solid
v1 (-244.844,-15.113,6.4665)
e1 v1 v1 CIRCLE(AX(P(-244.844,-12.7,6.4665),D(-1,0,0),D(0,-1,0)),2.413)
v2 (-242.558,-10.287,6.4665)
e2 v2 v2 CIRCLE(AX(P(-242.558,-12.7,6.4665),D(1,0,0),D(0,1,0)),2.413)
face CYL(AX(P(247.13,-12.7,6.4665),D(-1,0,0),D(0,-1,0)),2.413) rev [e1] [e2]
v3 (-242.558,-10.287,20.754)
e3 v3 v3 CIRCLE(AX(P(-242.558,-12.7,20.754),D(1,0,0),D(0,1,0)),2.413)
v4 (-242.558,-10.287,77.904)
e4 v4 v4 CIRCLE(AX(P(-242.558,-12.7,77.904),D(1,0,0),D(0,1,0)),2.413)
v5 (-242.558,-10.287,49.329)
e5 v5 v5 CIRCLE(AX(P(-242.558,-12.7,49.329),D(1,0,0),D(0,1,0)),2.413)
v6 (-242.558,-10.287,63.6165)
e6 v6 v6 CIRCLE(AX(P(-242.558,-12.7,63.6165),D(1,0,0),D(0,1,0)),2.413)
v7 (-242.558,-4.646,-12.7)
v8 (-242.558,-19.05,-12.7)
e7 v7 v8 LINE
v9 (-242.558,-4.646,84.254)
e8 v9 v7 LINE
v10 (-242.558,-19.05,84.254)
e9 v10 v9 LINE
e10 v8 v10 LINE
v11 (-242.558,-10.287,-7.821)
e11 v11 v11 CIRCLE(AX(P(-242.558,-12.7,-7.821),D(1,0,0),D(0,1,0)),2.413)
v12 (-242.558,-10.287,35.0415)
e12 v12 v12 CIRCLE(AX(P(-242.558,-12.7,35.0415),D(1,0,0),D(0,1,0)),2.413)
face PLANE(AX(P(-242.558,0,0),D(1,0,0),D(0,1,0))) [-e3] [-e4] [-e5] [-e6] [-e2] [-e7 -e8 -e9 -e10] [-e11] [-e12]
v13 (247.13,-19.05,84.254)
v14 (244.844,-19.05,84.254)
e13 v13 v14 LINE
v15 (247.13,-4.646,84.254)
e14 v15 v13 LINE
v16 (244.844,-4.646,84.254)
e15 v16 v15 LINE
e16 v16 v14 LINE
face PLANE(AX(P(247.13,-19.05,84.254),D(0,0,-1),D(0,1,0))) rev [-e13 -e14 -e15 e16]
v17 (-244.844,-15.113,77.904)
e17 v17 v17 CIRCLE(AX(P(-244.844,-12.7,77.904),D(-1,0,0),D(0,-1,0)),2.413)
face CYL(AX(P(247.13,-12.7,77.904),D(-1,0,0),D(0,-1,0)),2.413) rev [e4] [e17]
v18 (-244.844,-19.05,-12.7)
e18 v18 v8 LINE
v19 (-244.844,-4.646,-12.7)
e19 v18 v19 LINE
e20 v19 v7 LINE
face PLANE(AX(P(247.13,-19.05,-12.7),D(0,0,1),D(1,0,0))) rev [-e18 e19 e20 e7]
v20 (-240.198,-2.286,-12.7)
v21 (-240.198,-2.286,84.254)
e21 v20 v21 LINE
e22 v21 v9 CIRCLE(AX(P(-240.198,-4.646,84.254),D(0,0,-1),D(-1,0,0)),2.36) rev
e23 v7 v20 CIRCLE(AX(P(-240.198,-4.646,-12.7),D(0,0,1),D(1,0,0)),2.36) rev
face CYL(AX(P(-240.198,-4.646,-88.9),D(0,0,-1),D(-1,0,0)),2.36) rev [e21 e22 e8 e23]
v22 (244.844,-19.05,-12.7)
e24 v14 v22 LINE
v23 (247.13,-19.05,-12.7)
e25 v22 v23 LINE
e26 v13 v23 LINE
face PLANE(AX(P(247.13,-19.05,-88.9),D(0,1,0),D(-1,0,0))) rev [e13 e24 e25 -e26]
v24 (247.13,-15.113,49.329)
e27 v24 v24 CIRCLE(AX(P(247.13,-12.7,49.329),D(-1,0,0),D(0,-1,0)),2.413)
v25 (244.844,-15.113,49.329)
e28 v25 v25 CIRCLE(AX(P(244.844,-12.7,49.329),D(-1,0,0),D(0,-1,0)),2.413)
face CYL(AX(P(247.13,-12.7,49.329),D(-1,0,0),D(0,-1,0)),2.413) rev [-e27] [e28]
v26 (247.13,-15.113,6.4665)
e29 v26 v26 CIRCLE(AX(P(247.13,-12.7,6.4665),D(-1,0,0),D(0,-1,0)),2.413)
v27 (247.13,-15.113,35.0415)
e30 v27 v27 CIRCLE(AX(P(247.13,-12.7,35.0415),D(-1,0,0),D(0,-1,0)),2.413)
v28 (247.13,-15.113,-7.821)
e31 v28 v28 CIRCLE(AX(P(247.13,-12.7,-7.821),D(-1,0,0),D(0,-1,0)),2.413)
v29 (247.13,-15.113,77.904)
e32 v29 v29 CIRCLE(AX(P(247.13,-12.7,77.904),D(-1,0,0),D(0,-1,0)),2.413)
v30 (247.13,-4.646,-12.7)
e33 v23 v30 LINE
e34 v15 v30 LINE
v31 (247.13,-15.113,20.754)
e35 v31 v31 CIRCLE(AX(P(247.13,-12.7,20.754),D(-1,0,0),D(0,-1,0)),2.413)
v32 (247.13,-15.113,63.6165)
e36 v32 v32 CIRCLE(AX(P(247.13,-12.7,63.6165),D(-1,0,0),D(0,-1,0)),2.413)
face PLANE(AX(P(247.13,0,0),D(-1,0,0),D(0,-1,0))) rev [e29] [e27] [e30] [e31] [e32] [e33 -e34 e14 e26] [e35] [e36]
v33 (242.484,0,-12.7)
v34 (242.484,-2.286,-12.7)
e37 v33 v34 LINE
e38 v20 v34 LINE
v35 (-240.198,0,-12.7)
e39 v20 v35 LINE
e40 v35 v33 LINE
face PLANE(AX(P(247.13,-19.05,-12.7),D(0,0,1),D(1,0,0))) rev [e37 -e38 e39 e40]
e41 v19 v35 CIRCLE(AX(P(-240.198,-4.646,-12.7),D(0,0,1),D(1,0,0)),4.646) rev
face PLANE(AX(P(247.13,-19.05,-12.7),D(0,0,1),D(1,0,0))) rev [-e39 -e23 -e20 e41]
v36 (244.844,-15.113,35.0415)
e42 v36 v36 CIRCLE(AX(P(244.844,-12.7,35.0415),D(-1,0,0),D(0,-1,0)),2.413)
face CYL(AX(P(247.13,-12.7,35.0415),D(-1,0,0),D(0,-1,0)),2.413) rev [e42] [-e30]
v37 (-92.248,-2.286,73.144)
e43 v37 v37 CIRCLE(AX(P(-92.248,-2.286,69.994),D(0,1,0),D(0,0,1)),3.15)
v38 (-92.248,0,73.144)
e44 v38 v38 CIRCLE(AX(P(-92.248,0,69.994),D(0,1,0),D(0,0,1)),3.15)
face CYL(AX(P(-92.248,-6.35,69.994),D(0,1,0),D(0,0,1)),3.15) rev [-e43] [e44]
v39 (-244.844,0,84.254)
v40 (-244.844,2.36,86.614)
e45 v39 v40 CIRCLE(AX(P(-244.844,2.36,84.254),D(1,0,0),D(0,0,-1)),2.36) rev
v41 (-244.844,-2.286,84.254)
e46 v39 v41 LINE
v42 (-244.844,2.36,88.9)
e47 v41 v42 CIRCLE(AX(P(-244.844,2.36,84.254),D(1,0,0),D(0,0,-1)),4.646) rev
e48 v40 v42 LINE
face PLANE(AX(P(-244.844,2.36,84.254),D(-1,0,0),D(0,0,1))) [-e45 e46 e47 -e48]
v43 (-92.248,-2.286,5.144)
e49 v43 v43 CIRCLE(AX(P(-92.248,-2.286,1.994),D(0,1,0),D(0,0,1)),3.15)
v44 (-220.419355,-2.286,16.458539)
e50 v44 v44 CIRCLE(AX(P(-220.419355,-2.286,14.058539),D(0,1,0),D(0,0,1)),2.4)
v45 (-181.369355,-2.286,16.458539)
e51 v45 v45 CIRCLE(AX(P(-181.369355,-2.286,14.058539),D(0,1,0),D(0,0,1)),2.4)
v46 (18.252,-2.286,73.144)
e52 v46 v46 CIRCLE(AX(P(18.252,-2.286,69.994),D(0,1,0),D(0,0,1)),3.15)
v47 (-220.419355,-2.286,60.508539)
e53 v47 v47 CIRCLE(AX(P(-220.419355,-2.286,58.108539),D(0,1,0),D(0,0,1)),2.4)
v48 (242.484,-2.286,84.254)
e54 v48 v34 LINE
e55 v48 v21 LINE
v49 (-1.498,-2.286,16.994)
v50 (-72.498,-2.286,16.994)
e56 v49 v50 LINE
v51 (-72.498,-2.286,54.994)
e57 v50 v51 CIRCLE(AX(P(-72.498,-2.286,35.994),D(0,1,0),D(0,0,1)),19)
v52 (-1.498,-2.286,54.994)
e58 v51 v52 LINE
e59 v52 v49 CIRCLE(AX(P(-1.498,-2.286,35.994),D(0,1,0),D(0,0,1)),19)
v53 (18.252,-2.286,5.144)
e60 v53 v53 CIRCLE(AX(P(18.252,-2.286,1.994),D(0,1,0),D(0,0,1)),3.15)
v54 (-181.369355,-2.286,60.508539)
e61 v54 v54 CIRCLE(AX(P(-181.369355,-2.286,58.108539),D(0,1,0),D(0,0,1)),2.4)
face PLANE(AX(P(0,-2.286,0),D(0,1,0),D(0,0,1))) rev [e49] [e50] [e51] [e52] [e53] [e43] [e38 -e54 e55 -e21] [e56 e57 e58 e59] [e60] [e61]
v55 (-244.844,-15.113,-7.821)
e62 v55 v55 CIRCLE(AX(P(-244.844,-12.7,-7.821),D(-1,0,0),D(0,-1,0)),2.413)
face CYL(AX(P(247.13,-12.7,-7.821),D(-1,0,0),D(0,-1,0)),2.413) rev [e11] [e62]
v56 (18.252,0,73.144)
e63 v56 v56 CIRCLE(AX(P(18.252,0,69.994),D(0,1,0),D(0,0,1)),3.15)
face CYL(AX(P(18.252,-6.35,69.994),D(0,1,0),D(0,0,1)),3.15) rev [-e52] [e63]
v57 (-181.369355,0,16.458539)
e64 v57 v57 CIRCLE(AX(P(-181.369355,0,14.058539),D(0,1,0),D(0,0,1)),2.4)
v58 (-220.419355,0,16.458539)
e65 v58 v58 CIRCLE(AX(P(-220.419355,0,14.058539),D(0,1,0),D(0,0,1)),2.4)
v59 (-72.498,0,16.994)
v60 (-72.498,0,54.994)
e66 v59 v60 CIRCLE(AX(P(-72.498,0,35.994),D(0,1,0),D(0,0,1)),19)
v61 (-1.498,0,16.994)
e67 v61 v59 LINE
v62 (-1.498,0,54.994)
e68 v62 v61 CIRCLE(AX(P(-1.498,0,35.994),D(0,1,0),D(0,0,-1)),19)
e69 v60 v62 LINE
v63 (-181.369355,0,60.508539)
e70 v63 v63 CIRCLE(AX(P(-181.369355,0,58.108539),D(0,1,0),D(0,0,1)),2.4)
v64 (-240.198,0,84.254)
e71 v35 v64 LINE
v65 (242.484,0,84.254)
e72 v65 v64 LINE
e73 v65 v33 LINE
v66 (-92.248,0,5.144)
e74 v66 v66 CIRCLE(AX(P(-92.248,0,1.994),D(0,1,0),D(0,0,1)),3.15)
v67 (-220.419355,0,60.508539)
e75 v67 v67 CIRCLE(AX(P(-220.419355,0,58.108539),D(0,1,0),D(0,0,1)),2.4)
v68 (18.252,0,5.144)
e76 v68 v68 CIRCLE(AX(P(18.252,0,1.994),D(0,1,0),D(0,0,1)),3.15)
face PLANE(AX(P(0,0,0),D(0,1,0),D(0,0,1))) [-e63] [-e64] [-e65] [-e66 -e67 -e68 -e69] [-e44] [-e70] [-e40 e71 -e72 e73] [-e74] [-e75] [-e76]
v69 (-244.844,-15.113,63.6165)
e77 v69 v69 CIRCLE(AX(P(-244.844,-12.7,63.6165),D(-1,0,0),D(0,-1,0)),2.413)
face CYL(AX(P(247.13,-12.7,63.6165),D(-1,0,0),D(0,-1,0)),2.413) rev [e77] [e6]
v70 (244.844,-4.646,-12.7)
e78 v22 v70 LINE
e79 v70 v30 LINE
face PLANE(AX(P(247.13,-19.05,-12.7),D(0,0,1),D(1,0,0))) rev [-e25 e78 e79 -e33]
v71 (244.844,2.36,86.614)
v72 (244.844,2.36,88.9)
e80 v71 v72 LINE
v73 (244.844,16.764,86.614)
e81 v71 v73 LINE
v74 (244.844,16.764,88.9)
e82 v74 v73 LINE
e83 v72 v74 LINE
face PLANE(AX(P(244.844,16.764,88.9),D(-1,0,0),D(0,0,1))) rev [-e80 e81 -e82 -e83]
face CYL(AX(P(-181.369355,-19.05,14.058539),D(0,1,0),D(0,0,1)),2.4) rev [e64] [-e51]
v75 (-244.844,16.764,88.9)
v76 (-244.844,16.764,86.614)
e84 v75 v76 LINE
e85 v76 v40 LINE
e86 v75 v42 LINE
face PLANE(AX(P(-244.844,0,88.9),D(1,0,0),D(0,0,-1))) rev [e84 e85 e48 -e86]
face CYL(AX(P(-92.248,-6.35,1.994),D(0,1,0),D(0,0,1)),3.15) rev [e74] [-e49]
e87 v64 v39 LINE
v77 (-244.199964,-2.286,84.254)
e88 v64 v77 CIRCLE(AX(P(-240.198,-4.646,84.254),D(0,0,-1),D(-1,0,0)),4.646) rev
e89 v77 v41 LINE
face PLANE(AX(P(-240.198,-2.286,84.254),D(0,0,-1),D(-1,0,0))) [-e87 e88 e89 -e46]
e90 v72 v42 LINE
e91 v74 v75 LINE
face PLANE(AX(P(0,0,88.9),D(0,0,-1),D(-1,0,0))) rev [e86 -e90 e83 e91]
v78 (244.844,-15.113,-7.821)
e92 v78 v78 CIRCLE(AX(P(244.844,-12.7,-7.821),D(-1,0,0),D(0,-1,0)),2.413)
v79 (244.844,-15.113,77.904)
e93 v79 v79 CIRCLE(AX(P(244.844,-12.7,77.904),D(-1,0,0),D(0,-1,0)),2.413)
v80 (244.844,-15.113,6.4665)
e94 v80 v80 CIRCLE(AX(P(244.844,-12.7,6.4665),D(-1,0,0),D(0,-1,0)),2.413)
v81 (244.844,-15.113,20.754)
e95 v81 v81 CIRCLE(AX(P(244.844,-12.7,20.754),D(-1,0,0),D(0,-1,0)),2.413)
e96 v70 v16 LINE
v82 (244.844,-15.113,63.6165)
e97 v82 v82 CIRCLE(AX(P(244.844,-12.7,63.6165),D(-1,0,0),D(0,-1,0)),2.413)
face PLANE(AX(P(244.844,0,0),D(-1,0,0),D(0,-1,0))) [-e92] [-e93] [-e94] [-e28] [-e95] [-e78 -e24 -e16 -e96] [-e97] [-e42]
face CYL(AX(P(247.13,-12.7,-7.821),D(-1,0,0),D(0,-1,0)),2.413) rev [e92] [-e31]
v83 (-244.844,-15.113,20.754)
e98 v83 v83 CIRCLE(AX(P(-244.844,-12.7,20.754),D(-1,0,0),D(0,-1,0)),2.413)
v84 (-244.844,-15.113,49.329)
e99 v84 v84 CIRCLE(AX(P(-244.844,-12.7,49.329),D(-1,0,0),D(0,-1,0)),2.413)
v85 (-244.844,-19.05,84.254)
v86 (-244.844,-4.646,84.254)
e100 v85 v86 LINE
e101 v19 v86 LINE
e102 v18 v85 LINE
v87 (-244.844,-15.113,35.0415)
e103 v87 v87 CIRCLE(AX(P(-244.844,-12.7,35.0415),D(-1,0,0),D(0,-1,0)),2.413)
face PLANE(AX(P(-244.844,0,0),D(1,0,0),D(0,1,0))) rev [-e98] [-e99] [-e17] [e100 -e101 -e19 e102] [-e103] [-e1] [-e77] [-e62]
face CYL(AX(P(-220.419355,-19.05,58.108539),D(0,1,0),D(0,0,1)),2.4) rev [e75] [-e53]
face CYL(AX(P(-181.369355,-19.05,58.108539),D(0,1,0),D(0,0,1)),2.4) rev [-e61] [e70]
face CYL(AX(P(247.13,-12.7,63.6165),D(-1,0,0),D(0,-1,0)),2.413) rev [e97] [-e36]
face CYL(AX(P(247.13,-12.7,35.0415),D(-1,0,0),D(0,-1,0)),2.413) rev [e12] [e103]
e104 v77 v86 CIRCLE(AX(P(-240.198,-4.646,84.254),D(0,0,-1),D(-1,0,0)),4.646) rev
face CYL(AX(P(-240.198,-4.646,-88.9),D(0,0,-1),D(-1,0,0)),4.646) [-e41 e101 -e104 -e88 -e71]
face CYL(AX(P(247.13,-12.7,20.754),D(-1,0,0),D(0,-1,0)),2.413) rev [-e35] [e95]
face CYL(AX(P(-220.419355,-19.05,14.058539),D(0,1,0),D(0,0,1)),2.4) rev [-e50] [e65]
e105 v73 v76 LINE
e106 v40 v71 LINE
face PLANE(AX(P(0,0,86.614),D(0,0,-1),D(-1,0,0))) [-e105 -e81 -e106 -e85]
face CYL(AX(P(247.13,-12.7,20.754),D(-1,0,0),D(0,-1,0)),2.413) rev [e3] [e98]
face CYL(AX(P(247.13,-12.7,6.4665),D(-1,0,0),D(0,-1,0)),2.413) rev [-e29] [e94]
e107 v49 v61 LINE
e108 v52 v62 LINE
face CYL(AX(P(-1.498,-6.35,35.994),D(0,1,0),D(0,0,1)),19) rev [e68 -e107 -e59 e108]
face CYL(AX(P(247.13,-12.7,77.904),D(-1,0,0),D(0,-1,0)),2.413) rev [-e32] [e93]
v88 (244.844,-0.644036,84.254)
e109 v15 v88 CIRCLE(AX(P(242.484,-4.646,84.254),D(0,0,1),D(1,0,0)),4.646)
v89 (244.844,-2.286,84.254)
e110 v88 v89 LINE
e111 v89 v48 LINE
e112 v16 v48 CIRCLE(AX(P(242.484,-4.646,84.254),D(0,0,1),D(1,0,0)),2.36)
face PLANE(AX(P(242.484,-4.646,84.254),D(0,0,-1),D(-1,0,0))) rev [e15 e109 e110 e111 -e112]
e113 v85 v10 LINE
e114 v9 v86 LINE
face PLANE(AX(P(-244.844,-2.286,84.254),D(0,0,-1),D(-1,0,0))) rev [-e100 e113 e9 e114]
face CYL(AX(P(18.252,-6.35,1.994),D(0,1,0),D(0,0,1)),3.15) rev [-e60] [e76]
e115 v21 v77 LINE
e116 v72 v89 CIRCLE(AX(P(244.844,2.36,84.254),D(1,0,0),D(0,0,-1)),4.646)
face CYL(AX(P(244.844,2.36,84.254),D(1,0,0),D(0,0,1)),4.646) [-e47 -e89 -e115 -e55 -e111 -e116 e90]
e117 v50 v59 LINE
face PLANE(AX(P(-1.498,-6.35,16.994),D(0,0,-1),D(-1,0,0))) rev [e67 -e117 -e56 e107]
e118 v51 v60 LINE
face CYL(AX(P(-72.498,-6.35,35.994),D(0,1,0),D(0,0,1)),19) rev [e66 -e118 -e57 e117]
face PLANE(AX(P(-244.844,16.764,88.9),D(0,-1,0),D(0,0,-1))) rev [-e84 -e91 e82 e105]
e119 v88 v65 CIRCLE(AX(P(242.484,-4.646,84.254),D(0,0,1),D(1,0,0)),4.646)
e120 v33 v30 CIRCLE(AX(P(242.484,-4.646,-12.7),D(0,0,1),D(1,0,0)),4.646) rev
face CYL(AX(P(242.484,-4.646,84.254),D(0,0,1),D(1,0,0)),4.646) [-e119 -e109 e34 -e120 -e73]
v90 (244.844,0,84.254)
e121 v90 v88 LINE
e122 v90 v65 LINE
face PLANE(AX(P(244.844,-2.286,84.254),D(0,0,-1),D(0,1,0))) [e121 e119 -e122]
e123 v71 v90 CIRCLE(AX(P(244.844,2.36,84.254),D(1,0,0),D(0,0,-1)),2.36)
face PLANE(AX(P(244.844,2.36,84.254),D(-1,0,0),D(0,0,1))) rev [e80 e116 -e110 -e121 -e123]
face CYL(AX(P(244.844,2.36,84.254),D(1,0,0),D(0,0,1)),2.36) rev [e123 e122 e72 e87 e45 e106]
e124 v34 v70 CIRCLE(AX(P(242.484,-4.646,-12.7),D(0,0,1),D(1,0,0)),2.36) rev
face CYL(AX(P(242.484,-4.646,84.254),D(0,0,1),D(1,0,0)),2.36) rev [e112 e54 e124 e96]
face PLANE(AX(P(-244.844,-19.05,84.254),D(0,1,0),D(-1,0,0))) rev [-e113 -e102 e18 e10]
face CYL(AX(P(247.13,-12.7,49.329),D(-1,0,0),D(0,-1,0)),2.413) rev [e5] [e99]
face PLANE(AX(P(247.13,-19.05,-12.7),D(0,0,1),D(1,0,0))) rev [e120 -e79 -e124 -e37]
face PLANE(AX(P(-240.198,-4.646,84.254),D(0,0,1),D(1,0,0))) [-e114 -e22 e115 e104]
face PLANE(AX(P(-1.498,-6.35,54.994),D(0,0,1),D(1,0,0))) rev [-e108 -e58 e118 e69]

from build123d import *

# Parameters (mm, degrees)
SKETCH1_W                    = 489.688000048
SKETCH1_H                    = 177.8
BASE_FLANGE1_DEPTH           = 2.286
EDGE_FLANGE1_STRIP_W         = 13.864
EDGE_FLANGE1_STRIP_H         = 2.286
EDGE_FLANGE1_STRIP_CUT_DEPTH = 489.688000048
EDGE_FLANGE1_DEPTH           = 489.688000048
EDGE_FLANGE2_STRIP_W         = 13.864
EDGE_FLANGE2_STRIP_H         = 2.286
EDGE_FLANGE2_STRIP_CUT_DEPTH = 173.154
EDGE_FLANGE2_DEPTH           = 173.154
EDGE_FLANGE3_STRIP_W         = 13.864
EDGE_FLANGE3_STRIP_H         = 2.286
EDGE_FLANGE3_STRIP_CUT_DEPTH = 173.154
EDGE_FLANGE3_DEPTH           = 173.154
SKETCH15_R                   = 3.15
CUT_EXTRUDE1_DEPTH           = 6.35
SKETCH33_W                   = 491.974000048
SKETCH33_H                   = 152.4
CUT_EXTRUDE5_DEPTH           = 264.323659043
SKETCH40_R                   = 2.413
CUT_EXTRUDE10_DEPTH          = 501.304436542
SKETCH42_R                   = 2.4
CUT_EXTRUDE11_DEPTH          = 264.323659043


# Sheet-metal steps are written as plain solids
with BuildPart() as part:
    # Sketch1 → Base-Flange1 (new body)
    with BuildSketch(Plane(origin=(0, 0, 0), x_dir=(1, 0, 0), z_dir=(0, 1, 0))):
        Rectangle(SKETCH1_W, SKETCH1_H)
    extrude(amount=-BASE_FLANGE1_DEPTH)

    # Edge-Flange1 strip (across the edge) → Edge-Flange1 strip cut (cut)
    with BuildSketch(Plane(origin=(-244.844000024, 0, 88.9), x_dir=(0, 0, -1), z_dir=(1, 0, 0))):
        with Locations((-2.286, -1.143)):
            Rectangle(EDGE_FLANGE1_STRIP_W, EDGE_FLANGE1_STRIP_H)
    extrude(amount=EDGE_FLANGE1_STRIP_CUT_DEPTH, mode=Mode.SUBTRACT)

    # Edge-Flange1 section (across the edge) → Edge-Flange1 (add)
    with BuildSketch(Plane(origin=(-244.844000024, 0, 88.9), x_dir=(0, 0, -1), z_dir=(1, 0, 0))):
        with BuildLine():
            Line((0, 2.36), (0, 16.764))
            Line((0, 16.764), (2.286, 16.764))
            Line((2.286, 16.764), (2.286, 2.36))
            ThreePointArc((2.286, 2.36), (2.977227996, 0.691227996), (4.646, 0))
            Line((4.646, 0), (4.646, -2.286))
            ThreePointArc((4.646, -2.286), (1.360781895, -0.925218105), (0, 2.36))
        make_face()
    extrude(amount=EDGE_FLANGE1_DEPTH)

    # Edge-Flange2 strip (across the edge) → Edge-Flange2 strip cut (cut)
    with BuildSketch(Plane(origin=(-244.844000024, -2.286, 84.254), x_dir=(1, 0, 0), z_dir=(0, 0, -1))):
        with Locations((-2.286, -1.143)):
            Rectangle(EDGE_FLANGE2_STRIP_W, EDGE_FLANGE2_STRIP_H)
    extrude(amount=EDGE_FLANGE2_STRIP_CUT_DEPTH, mode=Mode.SUBTRACT)

    # Edge-Flange2 section (across the edge) → Edge-Flange2 (add)
    with BuildSketch(Plane(origin=(-244.844000024, -2.286, 84.254), x_dir=(1, 0, 0), z_dir=(0, 0, -1))):
        with BuildLine():
            Line((0, 2.36), (0, 16.764))
            Line((0, 16.764), (2.286, 16.764))
            Line((2.286, 16.764), (2.286, 2.36))
            ThreePointArc((2.286, 2.36), (2.977227996, 0.691227996), (4.646, 0))
            Line((4.646, 0), (4.646, -2.286))
            ThreePointArc((4.646, -2.286), (1.360781895, -0.925218105), (0, 2.36))
        make_face()
    extrude(amount=EDGE_FLANGE2_DEPTH)

    # Edge-Flange3 strip (across the edge) → Edge-Flange3 strip cut (cut)
    with BuildSketch(Plane(origin=(244.844000024, -2.286, -88.9), x_dir=(-1, 0, 0), z_dir=(0, 0, 1))):
        with Locations((-4.572, -1.143)):
            Rectangle(EDGE_FLANGE3_STRIP_W, EDGE_FLANGE3_STRIP_H)
    extrude(amount=EDGE_FLANGE3_STRIP_CUT_DEPTH, mode=Mode.SUBTRACT)

    # Edge-Flange3 section (across the edge) → Edge-Flange3 (add)
    with BuildSketch(Plane(origin=(244.844000024, -2.286, -88.9), x_dir=(-1, 0, 0), z_dir=(0, 0, 1))):
        with BuildLine():
            Line((-2.286, 2.36), (-2.286, 16.764))
            Line((-2.286, 16.764), (0, 16.764))
            Line((0, 16.764), (0, 2.36))
            ThreePointArc((0, 2.36), (0.691227996, 0.691227996), (2.36, 0))
            Line((2.36, 0), (2.36, -2.286))
            ThreePointArc((2.36, -2.286), (-0.925218105, -0.925218105), (-2.286, 2.36))
        make_face()
    extrude(amount=EDGE_FLANGE3_DEPTH)

    # Sketch15 → Cut-Extrude1 (cut)
    with BuildSketch(Plane(origin=(0, 0, 0), x_dir=(1, 0, 0), z_dir=(0, 1, 0))):
        with Locations(Location((-92.248000024, -1.994, 0), (0, 0, 270))):
            Circle(SKETCH15_R)
        with Locations(Location((-92.248000024, -69.994, 0), (0, 0, 270))):
            Circle(SKETCH15_R)
        with Locations(Location((18.251999976, -69.994, 0), (0, 0, 270))):
            Circle(SKETCH15_R)
        with Locations(Location((18.251999976, -1.994, 0), (0, 0, 270))):
            Circle(SKETCH15_R)
        with BuildLine():
            Line((-1.498000024, -54.994), (-72.498000024, -54.994))
            ThreePointArc((-72.498000024, -54.994), (-91.498000024, -35.994), (-72.498000024, -16.994))
            Line((-72.498000024, -16.994), (-1.498000024, -16.994))
            ThreePointArc((-1.498000024, -16.994), (17.501999976, -35.994), (-1.498000024, -54.994))
        make_face()
    extrude(amount=-CUT_EXTRUDE1_DEPTH, mode=Mode.SUBTRACT)

    # Sketch33 → Cut-Extrude5 (cut, through all)
    with BuildSketch(Plane(origin=(0, 0, 0), x_dir=(1, 0, 0), z_dir=(0, 1, 0))):
        with Locations((1.143, 88.9)):
            Rectangle(SKETCH33_W, SKETCH33_H)
    extrude(amount=-CUT_EXTRUDE5_DEPTH, mode=Mode.SUBTRACT)

    # Sketch40 → Cut-Extrude10 (cut, through all)
    with BuildSketch(Plane.ZY.offset(244.844000024)):
        with Locations(Location((77.904, -12.7, 0), (0, 0, 270))):
            Circle(SKETCH40_R)
        with Locations(Location((63.6165, -12.7, 0), (0, 0, 270))):
            Circle(SKETCH40_R)
        with Locations(Location((49.329, -12.7, 0), (0, 0, 270))):
            Circle(SKETCH40_R)
        with Locations(Location((35.0415, -12.7, 0), (0, 0, 270))):
            Circle(SKETCH40_R)
        with Locations(Location((20.754, -12.7, 0), (0, 0, 270))):
            Circle(SKETCH40_R)
        with Locations(Location((6.4665, -12.7, 0), (0, 0, 270))):
            Circle(SKETCH40_R)
        with Locations(Location((-7.821, -12.7, 0), (0, 0, 270))):
            Circle(SKETCH40_R)
    extrude(amount=-CUT_EXTRUDE10_DEPTH, mode=Mode.SUBTRACT)

    # Sketch42 → Cut-Extrude11 (cut, through all)
    with BuildSketch(Plane(origin=(0, 0, 0), x_dir=(1, 0, 0), z_dir=(0, 1, 0))):
        with Locations(Location((-220.419354597, -14.058539081, 0), (0, 0, 270))):
            Circle(SKETCH42_R)
        with Locations(Location((-181.369354597, -14.058539081, 0), (0, 0, 270))):
            Circle(SKETCH42_R)
        with Locations(Location((-181.369354597, -58.108539081, 0), (0, 0, 270))):
            Circle(SKETCH42_R)
        with Locations(Location((-220.419354597, -58.108539081, 0), (0, 0, 270))):
            Circle(SKETCH42_R)
    extrude(amount=-CUT_EXTRUDE11_DEPTH, mode=Mode.SUBTRACT)


solid = part.part
